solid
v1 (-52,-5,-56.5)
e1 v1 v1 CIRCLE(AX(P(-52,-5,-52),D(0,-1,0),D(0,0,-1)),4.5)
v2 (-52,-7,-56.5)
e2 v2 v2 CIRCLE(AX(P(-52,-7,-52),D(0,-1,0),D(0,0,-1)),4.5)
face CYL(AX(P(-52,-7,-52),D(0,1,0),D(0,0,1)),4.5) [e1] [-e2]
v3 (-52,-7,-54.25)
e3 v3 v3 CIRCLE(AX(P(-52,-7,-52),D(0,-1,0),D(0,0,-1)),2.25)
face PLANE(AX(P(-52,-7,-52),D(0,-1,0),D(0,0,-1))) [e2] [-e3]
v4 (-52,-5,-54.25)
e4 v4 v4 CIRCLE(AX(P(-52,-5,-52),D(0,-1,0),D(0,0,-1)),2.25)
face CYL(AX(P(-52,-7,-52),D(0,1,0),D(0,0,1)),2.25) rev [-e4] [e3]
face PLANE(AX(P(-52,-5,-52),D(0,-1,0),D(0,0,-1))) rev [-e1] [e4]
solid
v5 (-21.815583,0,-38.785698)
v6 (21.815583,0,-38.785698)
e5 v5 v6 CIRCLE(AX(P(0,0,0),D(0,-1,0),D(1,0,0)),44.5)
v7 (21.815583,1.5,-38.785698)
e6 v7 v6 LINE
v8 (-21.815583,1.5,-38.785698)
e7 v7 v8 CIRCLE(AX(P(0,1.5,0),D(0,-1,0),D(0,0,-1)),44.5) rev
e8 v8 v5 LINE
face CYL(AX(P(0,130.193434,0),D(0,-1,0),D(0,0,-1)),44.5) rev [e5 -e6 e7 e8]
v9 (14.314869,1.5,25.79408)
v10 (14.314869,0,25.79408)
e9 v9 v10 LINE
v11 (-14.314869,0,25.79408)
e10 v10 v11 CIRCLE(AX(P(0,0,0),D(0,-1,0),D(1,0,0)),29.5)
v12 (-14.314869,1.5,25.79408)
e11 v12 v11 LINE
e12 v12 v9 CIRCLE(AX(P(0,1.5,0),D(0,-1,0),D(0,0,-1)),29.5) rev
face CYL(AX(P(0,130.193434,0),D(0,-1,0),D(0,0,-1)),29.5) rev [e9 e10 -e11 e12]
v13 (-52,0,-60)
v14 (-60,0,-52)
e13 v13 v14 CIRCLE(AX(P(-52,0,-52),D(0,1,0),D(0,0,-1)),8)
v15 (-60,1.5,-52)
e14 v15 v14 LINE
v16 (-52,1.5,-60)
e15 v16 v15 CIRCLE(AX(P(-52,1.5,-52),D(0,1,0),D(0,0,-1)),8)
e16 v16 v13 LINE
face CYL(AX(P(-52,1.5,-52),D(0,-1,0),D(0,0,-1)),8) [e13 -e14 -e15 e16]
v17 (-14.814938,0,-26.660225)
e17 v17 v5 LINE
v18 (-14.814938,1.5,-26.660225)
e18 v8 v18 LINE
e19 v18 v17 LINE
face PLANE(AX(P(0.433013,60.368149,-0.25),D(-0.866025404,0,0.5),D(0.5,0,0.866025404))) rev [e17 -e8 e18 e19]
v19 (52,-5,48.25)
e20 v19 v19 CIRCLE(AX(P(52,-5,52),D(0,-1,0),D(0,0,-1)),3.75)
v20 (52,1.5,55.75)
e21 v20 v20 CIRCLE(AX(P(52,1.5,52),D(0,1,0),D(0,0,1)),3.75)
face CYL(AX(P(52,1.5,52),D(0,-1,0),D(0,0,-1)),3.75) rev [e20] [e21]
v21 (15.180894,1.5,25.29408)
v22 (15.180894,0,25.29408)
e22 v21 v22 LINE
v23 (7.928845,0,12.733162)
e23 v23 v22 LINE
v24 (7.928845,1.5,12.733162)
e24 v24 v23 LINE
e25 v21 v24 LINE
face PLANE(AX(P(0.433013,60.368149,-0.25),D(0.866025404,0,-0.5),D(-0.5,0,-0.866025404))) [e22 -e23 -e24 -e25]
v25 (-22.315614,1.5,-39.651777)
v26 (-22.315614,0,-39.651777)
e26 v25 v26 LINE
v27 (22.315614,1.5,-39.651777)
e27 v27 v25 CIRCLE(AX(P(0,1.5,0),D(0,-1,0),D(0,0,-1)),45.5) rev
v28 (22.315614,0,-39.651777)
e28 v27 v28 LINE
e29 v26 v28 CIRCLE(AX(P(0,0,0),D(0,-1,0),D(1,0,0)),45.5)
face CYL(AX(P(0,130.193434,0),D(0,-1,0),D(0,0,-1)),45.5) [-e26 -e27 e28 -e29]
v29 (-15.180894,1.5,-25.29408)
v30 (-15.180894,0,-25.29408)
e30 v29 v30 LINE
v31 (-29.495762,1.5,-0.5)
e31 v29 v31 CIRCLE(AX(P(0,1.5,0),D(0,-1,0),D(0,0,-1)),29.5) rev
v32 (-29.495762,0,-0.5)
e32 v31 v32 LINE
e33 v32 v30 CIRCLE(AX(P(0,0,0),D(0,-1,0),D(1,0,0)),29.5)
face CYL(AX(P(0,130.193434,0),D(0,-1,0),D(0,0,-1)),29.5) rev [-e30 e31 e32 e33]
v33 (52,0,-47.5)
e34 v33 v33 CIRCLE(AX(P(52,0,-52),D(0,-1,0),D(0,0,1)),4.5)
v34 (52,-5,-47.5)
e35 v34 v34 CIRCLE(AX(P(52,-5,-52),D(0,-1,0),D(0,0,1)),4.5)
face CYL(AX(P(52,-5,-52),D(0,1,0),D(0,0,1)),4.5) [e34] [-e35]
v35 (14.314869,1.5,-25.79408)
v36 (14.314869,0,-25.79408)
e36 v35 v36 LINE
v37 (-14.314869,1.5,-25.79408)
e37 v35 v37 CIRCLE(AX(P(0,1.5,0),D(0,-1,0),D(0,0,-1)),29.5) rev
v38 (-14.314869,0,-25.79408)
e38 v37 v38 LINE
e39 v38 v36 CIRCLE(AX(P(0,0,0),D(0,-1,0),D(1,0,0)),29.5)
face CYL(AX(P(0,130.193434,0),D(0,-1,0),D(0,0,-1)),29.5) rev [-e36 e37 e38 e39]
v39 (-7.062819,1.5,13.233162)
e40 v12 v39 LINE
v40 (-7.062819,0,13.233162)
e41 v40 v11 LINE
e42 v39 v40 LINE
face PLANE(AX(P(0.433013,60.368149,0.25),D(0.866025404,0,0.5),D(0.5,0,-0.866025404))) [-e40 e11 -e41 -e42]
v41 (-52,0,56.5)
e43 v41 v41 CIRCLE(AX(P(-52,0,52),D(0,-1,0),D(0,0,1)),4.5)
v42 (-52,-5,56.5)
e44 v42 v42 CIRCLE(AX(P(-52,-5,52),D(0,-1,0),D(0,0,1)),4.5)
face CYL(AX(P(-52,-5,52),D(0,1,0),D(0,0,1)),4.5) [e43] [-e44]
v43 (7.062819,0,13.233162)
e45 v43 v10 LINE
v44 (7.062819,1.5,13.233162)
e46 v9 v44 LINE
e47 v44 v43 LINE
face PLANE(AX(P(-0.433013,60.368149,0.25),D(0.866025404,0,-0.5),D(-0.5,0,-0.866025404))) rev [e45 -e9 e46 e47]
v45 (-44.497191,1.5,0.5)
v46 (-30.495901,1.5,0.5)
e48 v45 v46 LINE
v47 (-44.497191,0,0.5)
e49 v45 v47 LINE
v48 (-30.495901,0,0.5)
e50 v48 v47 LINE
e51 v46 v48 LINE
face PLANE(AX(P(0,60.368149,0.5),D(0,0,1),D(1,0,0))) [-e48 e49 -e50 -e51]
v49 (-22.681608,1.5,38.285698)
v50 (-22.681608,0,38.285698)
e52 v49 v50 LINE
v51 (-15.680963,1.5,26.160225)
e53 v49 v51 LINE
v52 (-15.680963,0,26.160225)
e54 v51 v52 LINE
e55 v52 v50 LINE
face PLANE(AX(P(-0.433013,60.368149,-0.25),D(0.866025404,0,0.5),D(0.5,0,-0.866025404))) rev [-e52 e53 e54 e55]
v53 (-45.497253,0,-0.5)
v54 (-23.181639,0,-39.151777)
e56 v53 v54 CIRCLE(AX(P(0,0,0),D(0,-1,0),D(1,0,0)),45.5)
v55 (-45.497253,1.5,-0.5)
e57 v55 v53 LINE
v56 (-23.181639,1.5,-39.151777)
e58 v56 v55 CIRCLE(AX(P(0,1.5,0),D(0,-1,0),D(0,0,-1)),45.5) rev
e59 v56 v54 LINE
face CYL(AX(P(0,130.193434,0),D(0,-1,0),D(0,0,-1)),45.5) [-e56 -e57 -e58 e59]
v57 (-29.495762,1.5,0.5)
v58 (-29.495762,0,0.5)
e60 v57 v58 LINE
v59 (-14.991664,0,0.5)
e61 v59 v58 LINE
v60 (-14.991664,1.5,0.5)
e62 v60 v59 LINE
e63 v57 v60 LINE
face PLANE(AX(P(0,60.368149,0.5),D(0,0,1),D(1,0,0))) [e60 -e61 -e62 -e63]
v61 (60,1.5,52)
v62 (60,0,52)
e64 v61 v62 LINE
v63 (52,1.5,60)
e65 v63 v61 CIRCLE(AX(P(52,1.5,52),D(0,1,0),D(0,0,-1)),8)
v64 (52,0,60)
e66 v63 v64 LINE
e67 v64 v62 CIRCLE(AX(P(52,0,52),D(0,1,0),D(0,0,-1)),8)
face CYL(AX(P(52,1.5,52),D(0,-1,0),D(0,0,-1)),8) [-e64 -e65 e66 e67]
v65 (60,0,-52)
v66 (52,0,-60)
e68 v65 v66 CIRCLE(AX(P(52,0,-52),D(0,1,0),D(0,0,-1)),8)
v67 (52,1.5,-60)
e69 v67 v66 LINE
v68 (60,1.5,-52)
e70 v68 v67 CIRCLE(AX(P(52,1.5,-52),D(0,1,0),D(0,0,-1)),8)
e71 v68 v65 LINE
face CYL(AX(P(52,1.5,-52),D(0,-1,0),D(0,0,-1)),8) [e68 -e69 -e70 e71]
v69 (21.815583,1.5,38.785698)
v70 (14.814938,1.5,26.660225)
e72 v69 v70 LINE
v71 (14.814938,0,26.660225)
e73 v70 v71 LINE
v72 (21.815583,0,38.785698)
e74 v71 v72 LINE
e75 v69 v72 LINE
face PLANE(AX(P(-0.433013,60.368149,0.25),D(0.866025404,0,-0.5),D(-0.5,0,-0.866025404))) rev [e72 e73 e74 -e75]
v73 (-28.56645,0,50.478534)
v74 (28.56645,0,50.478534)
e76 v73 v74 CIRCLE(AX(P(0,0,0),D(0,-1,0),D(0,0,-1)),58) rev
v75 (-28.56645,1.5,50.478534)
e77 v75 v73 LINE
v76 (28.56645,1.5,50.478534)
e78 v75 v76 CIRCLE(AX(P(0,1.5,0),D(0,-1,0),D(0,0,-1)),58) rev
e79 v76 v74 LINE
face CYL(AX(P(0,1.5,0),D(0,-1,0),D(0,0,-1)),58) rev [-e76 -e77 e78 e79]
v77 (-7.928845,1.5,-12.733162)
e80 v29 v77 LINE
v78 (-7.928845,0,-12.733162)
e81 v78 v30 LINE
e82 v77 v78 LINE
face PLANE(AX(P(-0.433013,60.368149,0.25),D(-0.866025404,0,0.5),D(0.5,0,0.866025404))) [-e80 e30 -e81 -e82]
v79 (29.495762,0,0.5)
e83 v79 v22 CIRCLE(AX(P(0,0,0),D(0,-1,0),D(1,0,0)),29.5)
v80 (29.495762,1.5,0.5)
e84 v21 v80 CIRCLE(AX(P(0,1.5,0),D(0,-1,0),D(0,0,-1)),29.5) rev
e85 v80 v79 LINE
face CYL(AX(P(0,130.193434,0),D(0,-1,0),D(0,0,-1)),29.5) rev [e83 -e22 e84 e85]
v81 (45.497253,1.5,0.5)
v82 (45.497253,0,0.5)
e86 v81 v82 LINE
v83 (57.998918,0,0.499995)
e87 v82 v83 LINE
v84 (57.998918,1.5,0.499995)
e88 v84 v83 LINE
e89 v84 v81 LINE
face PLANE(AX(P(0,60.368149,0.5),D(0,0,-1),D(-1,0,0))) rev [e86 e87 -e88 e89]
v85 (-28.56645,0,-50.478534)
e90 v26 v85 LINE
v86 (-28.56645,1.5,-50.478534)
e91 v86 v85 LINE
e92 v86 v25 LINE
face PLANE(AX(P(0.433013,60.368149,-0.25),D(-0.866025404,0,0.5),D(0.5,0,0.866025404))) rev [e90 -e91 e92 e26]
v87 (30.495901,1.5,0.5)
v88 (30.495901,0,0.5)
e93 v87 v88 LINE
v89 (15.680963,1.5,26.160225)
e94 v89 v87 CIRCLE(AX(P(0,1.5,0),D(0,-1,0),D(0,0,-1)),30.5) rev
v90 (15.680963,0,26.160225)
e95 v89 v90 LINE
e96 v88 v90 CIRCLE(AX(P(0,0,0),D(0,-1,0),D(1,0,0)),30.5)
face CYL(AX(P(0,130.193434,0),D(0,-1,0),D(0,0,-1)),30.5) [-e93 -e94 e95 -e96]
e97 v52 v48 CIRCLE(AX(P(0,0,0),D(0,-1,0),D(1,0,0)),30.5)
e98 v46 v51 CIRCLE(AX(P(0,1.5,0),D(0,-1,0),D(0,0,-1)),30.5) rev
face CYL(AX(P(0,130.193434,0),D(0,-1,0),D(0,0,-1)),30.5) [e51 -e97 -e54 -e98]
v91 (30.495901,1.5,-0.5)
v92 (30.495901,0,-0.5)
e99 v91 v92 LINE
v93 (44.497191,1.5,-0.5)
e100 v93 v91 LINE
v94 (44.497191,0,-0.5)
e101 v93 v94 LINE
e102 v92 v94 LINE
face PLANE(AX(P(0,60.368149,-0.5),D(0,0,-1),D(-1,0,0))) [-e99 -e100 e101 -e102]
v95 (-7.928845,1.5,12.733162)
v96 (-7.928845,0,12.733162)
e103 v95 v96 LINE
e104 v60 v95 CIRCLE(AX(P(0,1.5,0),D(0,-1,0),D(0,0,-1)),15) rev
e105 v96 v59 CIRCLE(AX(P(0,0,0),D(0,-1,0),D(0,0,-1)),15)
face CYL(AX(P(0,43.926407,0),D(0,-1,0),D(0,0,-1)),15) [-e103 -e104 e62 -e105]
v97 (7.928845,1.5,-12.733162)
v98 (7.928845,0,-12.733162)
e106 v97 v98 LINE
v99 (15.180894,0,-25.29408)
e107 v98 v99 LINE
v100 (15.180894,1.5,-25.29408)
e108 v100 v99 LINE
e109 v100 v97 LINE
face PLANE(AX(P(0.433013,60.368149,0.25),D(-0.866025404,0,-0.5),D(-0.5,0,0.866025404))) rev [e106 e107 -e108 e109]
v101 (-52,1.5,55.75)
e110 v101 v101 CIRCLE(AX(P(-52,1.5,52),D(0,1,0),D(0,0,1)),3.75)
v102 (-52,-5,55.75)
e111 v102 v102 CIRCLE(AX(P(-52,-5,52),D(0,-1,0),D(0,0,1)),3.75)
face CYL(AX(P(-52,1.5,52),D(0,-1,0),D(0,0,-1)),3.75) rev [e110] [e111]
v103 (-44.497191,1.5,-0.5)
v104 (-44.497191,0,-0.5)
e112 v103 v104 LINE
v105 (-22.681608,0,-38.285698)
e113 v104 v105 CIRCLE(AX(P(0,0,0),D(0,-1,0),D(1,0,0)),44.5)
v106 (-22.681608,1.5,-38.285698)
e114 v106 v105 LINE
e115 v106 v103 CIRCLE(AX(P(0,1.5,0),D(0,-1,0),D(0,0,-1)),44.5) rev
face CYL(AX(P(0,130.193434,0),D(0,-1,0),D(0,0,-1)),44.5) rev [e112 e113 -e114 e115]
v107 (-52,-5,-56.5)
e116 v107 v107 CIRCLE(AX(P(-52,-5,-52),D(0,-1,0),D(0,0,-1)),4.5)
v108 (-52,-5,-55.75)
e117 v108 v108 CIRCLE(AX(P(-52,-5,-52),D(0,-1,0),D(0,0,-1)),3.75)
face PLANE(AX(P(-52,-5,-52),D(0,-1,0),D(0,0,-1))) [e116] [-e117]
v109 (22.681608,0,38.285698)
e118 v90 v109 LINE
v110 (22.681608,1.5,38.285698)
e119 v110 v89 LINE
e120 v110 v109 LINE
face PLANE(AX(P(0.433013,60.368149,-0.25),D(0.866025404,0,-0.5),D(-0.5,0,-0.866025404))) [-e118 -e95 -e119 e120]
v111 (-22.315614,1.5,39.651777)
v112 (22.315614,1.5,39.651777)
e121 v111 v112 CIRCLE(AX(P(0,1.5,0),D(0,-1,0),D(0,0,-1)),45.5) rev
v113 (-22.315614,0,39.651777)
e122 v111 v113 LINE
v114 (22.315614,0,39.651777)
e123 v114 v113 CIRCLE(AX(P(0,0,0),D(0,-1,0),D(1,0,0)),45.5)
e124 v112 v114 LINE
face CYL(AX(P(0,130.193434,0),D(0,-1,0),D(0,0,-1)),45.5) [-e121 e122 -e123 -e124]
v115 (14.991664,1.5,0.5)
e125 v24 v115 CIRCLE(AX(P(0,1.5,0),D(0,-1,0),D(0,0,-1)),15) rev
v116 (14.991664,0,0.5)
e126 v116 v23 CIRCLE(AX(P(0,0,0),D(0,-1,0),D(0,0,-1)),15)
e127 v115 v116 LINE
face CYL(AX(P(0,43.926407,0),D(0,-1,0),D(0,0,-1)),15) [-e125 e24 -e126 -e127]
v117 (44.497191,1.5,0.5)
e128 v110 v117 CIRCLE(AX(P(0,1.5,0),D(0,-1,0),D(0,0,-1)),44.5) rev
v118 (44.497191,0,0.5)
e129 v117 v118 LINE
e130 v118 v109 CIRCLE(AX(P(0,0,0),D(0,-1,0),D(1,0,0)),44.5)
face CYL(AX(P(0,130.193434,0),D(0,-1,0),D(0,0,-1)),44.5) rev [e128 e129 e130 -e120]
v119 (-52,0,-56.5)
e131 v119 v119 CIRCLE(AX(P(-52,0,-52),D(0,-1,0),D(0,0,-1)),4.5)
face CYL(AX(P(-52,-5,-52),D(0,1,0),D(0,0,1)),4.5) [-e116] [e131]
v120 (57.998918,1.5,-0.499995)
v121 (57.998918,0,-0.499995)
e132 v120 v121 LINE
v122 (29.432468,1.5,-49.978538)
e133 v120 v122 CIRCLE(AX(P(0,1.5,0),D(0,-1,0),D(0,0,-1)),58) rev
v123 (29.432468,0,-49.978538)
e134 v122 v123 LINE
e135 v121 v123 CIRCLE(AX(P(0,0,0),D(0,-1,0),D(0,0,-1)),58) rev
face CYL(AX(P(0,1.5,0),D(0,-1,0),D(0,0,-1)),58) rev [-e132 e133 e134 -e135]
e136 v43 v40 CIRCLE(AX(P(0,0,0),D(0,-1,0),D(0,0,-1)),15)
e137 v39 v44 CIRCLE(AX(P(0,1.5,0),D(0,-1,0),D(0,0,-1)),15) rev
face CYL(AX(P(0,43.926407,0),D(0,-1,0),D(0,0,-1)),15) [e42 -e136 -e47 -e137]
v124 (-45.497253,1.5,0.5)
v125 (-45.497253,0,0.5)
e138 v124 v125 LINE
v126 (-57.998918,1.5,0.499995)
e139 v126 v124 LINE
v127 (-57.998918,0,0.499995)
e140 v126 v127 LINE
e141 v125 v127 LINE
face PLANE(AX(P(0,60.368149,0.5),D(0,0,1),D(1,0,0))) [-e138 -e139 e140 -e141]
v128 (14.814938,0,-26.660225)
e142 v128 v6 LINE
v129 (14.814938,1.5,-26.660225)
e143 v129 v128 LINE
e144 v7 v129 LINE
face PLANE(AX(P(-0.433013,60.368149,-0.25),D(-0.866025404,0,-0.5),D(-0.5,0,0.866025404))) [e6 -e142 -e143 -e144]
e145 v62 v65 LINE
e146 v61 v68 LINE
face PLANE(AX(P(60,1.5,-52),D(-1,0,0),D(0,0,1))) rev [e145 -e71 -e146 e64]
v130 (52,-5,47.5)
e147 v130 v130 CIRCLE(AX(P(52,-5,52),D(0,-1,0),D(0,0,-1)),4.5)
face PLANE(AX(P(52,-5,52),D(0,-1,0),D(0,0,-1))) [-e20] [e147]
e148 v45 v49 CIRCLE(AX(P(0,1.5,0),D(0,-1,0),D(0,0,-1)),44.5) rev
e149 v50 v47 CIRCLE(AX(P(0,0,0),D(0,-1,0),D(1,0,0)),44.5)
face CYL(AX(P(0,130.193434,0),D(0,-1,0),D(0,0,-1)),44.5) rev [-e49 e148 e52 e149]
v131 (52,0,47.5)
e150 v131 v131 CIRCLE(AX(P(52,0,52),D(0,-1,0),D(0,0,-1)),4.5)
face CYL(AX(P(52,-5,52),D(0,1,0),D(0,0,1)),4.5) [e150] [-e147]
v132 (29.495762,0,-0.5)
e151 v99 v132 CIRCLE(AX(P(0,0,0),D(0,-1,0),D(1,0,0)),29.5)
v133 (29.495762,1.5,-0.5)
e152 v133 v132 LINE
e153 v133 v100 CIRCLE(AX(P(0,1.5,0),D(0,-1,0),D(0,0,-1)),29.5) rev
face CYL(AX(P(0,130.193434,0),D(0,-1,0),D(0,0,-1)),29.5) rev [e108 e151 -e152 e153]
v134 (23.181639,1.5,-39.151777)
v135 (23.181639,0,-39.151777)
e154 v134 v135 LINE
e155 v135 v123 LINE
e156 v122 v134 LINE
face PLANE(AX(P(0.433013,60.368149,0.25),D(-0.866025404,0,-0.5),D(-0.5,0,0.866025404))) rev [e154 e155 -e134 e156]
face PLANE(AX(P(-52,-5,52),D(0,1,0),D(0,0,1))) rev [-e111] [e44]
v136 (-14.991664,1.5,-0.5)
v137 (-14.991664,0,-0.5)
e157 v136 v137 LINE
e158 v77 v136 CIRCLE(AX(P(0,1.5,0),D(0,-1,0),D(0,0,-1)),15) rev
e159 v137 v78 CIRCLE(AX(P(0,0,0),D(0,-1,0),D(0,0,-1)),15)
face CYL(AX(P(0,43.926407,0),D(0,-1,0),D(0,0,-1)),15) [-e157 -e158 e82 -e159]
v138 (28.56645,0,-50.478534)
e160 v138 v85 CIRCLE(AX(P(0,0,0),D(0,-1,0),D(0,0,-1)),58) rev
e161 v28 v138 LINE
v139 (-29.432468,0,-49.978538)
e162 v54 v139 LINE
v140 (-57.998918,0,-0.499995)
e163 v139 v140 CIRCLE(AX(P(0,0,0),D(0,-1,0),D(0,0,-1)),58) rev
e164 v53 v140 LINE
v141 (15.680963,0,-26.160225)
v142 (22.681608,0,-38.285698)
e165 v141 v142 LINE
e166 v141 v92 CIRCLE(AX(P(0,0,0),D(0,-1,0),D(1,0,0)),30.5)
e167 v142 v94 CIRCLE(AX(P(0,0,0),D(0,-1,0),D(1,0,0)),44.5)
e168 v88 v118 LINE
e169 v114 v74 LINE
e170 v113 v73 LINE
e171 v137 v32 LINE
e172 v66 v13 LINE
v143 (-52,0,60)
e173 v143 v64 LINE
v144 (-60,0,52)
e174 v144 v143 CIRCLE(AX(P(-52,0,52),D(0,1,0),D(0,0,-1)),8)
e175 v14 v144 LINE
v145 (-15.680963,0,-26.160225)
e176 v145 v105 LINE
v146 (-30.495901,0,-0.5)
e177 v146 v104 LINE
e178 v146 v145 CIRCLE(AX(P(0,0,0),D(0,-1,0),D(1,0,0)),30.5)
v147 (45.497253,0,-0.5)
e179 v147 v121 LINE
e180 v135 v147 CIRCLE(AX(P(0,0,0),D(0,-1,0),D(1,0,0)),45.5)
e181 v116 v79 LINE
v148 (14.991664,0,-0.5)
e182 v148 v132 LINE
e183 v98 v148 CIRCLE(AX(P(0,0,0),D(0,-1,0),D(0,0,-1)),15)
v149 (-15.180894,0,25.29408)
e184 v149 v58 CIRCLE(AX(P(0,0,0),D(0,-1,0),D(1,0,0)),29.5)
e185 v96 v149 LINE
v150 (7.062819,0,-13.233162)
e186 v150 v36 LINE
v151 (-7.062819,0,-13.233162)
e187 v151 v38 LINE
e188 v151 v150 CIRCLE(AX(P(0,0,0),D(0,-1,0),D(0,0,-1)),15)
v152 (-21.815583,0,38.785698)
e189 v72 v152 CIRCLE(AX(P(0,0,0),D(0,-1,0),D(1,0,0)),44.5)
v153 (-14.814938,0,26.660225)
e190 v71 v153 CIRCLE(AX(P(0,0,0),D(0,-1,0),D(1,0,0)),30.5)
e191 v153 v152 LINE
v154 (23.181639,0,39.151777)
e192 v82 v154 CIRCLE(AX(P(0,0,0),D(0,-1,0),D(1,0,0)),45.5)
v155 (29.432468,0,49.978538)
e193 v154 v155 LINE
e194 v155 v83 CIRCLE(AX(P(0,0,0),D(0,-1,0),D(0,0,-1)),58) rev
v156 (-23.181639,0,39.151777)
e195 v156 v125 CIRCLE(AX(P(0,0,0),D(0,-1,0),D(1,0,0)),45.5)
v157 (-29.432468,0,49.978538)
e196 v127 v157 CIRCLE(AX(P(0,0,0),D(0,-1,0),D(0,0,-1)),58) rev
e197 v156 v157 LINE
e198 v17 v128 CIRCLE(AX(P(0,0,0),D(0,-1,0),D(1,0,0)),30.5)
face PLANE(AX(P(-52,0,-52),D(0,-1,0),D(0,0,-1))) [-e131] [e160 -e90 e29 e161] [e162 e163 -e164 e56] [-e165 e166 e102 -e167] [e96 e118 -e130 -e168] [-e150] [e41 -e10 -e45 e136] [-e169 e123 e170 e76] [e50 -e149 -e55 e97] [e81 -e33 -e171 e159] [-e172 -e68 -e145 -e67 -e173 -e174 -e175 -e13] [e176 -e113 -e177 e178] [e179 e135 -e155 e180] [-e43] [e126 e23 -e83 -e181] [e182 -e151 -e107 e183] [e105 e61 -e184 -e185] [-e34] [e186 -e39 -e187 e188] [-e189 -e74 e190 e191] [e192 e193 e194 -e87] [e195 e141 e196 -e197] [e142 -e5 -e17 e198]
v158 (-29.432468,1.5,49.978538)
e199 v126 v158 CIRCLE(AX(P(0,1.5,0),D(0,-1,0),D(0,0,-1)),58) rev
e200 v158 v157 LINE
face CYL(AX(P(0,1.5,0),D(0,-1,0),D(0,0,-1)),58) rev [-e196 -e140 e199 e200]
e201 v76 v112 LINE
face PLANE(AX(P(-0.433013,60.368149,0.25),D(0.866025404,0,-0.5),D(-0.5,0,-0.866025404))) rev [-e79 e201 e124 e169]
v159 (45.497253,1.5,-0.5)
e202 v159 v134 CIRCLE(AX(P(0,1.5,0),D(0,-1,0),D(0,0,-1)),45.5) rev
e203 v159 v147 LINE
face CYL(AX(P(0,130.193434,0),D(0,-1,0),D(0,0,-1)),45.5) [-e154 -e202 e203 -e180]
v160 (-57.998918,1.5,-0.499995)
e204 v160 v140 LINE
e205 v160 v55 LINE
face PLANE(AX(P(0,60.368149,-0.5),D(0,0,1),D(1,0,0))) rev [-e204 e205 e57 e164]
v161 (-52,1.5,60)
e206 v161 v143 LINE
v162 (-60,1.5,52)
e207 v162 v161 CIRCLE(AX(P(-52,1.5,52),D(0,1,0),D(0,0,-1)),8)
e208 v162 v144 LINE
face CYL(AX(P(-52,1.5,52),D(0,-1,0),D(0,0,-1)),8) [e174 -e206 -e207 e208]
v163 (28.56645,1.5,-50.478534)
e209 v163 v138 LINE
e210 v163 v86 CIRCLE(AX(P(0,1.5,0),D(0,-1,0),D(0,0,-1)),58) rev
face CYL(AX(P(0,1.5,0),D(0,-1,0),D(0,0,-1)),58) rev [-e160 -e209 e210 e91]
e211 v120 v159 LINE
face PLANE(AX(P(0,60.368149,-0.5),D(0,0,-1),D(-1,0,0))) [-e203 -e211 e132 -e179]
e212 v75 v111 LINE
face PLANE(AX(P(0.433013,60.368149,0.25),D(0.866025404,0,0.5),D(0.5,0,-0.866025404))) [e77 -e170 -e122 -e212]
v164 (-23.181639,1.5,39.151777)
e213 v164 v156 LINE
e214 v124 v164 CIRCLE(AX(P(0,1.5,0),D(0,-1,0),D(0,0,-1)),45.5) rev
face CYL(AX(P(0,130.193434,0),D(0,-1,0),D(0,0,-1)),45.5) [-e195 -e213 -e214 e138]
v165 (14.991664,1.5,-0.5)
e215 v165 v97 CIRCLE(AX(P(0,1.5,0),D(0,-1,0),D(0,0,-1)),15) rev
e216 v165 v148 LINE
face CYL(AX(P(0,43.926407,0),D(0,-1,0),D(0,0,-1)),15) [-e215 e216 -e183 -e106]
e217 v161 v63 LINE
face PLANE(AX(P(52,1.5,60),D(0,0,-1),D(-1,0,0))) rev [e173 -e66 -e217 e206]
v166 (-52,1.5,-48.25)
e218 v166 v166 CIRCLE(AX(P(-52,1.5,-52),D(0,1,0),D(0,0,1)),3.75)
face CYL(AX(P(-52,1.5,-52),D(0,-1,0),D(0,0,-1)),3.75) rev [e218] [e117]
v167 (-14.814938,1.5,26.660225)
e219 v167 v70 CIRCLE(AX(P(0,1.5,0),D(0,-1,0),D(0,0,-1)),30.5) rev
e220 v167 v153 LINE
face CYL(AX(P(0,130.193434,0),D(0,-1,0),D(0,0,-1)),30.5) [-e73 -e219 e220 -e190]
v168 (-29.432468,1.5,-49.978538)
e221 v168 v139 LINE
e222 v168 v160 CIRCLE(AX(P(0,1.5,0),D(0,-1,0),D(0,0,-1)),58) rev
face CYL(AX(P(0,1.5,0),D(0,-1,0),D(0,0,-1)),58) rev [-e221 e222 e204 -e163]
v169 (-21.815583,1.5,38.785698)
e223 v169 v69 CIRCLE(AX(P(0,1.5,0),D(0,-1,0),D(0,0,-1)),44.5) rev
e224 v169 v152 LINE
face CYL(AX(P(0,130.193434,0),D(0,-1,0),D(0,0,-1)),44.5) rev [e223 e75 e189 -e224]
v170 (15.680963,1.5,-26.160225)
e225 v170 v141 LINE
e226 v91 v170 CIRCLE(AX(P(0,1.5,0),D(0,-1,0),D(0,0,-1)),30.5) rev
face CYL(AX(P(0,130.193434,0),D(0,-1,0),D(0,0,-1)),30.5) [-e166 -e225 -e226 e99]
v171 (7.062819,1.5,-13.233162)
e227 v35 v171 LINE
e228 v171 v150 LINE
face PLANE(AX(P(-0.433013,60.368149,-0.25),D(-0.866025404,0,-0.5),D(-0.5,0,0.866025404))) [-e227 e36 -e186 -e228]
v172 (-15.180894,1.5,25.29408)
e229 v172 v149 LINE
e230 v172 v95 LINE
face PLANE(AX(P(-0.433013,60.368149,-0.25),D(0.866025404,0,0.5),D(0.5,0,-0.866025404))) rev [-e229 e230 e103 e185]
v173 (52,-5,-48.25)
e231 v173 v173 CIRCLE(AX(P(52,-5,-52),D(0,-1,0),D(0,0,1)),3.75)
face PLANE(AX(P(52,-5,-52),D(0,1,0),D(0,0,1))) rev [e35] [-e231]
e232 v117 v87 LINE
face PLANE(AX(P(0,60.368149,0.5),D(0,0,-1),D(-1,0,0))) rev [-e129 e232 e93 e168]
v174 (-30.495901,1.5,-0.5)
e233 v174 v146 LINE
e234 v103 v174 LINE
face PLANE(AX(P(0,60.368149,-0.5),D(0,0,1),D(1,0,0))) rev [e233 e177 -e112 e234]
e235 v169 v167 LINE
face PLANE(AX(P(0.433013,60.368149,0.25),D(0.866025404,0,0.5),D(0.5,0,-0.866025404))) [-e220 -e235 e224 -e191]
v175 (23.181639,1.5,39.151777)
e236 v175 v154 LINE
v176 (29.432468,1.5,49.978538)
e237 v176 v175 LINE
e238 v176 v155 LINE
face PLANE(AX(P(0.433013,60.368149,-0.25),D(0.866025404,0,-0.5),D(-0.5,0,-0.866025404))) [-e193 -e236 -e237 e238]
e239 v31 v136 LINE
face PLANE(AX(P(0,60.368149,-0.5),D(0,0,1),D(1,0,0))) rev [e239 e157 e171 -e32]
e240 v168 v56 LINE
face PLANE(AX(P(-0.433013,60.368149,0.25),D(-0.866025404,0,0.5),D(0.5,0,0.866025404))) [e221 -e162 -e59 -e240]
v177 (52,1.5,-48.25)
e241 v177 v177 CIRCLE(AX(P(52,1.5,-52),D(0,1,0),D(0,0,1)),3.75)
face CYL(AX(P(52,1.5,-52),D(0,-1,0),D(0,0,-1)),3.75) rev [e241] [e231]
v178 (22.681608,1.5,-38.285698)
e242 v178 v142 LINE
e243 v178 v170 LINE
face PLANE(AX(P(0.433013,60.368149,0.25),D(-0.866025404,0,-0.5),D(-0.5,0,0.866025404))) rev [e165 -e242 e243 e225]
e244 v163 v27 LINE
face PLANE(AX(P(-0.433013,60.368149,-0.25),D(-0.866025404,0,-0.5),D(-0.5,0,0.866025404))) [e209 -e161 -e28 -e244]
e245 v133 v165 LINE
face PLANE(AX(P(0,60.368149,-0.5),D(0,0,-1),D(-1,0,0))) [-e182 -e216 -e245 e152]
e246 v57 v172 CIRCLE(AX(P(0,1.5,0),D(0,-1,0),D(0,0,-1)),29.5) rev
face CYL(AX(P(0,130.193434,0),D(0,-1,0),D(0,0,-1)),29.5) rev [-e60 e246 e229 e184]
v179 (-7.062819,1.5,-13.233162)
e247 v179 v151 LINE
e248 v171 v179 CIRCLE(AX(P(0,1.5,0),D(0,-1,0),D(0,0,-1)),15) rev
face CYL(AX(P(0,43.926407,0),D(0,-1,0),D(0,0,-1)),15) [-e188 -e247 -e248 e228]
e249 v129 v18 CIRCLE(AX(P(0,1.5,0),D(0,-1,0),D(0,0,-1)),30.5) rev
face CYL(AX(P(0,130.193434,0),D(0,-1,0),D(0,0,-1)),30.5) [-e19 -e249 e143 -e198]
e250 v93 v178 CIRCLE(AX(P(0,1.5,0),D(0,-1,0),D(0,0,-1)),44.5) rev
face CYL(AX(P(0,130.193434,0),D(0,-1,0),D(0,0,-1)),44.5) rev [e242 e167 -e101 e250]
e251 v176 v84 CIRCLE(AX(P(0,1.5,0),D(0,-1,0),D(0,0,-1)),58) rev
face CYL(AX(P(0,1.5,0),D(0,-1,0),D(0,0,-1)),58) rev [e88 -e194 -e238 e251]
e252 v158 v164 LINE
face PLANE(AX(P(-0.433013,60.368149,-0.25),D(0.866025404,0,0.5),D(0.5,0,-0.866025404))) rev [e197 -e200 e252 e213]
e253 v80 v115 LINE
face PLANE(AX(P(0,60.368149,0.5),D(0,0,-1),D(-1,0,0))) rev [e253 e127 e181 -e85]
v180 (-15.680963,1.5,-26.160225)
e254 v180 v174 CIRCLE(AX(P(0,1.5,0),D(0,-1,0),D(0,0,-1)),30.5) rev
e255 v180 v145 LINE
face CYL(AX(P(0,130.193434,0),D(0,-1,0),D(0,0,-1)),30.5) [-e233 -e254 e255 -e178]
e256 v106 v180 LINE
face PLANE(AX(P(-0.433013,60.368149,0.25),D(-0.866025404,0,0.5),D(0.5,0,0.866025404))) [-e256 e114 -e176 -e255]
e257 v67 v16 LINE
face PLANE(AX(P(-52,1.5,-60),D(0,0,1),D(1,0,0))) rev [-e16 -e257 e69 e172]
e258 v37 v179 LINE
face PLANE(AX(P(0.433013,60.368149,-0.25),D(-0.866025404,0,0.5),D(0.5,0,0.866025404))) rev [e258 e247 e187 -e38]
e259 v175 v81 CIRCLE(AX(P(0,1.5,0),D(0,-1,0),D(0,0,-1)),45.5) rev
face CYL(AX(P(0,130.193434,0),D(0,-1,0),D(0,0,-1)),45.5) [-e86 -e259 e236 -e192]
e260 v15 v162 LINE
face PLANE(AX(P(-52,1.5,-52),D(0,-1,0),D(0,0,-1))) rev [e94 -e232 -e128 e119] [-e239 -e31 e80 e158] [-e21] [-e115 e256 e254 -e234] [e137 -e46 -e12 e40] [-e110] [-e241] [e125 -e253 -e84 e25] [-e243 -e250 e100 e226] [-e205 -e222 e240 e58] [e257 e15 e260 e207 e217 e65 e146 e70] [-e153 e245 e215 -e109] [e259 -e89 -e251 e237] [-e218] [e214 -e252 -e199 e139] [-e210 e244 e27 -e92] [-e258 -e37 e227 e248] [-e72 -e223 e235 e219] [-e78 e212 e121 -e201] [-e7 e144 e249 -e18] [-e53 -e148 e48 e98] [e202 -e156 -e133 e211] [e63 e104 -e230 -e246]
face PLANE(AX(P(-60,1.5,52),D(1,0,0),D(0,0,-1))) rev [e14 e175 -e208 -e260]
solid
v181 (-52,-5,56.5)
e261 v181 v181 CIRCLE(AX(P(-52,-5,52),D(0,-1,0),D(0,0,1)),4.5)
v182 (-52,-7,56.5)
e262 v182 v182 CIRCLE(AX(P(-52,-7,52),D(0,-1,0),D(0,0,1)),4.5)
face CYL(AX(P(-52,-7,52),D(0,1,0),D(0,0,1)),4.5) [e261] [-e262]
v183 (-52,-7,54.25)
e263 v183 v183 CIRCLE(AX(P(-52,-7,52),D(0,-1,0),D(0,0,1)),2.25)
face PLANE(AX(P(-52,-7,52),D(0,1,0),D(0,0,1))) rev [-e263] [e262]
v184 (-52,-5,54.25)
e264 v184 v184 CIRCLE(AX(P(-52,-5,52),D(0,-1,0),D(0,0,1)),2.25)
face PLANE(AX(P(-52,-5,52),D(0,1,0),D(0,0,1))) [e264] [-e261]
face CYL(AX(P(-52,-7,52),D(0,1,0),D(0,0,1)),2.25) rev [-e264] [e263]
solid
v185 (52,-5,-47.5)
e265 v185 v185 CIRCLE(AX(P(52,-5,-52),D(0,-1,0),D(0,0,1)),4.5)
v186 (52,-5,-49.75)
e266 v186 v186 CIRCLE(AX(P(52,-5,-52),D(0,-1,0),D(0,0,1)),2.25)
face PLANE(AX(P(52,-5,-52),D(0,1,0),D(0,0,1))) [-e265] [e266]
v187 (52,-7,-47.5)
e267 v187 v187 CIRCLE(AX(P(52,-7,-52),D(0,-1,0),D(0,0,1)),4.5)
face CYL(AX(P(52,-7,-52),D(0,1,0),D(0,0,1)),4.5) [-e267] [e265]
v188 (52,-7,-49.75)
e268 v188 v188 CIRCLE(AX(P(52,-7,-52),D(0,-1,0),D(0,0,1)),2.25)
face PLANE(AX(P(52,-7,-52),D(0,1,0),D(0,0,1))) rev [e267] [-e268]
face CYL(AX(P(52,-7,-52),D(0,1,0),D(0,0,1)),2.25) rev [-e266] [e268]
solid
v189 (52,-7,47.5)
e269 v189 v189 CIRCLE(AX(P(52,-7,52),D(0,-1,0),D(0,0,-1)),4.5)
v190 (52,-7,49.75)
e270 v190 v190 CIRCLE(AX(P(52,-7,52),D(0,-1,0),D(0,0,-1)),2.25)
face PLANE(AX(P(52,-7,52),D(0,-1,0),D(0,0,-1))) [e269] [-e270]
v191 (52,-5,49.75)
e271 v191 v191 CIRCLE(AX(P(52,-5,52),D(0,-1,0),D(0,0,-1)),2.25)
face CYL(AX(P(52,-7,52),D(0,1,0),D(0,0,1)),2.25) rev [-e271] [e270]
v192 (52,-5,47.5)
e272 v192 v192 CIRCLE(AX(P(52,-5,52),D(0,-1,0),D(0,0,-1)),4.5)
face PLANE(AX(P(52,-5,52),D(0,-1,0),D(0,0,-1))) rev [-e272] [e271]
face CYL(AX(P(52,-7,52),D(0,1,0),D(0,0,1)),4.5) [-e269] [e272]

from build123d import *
from build123d.topology import SkipClean

# Parameters (mm, degrees)
SKETCH_1_R        = 3.75
SKETCH_1_R_2      = 58
EXTRUDE_1_DEPTH   = 1.5
EXTRUDE_START     = -1.5
EXTRUDE_1_2_DEPTH = 1.5
EXTRUDE_2_DEPTH   = 1.5
EXTRUDE_START_2   = 5
SKETCH_3_R        = 4.5
SKETCH_3_R_2      = 3.75
EXTRUDE_3_DEPTH   = 5
SKETCH_4_R        = 4.5
SKETCH_4_R_2      = 2.25
EXTRUDE_4_DEPTH   = 2
EXTRUDE_4_2_DEPTH = 2
EXTRUDE_4_3_DEPTH = 2
EXTRUDE_4_4_DEPTH = 2


# Read off the part's stored shape, not the designer's step: 拉伸-薄壁1
with BuildPart() as part:
    # 草图1 → Extrude 1 (new body)
    with BuildSketch(Plane(origin=(0, 0, 0), x_dir=(1, 0, 0), z_dir=(0, 1, 0))):
        with BuildLine():
            Line((-52, 60), (52, 60))
            ThreePointArc((52, 60), (57.656854249, 57.656854249), (60, 52))
            Line((60, 52), (60, -52))
            ThreePointArc((60, -52), (57.656854249, -57.656854249), (52, -60))
            Line((52, -60), (-52, -60))
            ThreePointArc((-52, -60), (-57.656854249, -57.656854249), (-60, -52))
            Line((-60, -52), (-60, 52))
            ThreePointArc((-60, 52), (-57.656854249, 57.656854249), (-52, 60))
        make_face()
        with Locations(Location((52, 52, 0), (0, 0, 270))):
            Circle(SKETCH_1_R, mode=Mode.SUBTRACT)
        with Locations(Location((52, -52, 0), (0, 0, 270))):
            Circle(SKETCH_1_R, mode=Mode.SUBTRACT)
        with Locations(Location((-52, 52, 0), (0, 0, 270))):
            Circle(SKETCH_1_R, mode=Mode.SUBTRACT)
        with Locations(Location((-52, -52, 0), (0, 0, 270))):
            Circle(SKETCH_1_R, mode=Mode.SUBTRACT)
        with Locations(Location((0, 0, 0), (0, 0, 270))):
            Circle(SKETCH_1_R_2, mode=Mode.SUBTRACT)
    extrude(amount=EXTRUDE_1_DEPTH)

    # Extrude 1 2 outline → Extrude 1 2 (add)
    with BuildSketch(Plane.XZ.offset(EXTRUDE_START)):
        with BuildLine():
            Line((57.997844907, 0.499986102), (45.497252664, 0.5))
            ThreePointArc((45.497252664, 0.5), (39.404155872, 22.75), (23.181639034, 39.15177661))
            Line((23.181639034, 39.15177661), (29.431923607, 49.977613716))
            ThreePointArc((29.431923607, 49.977613716), (28.999999948, 50.229473449), (28.565921191, 50.477600443))
            Line((28.565921191, 50.477600443), (22.31561363, 39.65177661))
            ThreePointArc((22.31561363, 39.65177661), (0, 45.5), (-22.31561363, 39.65177661))
            Line((-22.31561363, 39.65177661), (-28.565921191, 50.477600443))
            ThreePointArc((-28.565921191, 50.477600443), (-28.999999948, 50.229473449), (-29.431923607, 49.977613716))
            Line((-29.431923607, 49.977613716), (-23.181639034, 39.15177661))
            ThreePointArc((-23.181639034, 39.15177661), (-39.404155872, 22.75), (-45.497252664, 0.5))
            Line((-45.497252664, 0.5), (-57.997844907, 0.499986102))
            ThreePointArc((-57.997844907, 0.499986102), (-58, 0), (-57.997844907, -0.499986102))
            Line((-57.997844907, -0.499986102), (-45.497252664, -0.5))
            ThreePointArc((-45.497252664, -0.5), (-39.404155872, -22.75), (-23.181639034, -39.15177661))
            Line((-23.181639034, -39.15177661), (-29.431923607, -49.977613716))
            ThreePointArc((-29.431923607, -49.977613716), (-28.999999948, -50.229473449), (-28.565921191, -50.477600443))
            Line((-28.565921191, -50.477600443), (-22.31561363, -39.65177661))
            ThreePointArc((-22.31561363, -39.65177661), (0, -45.5), (22.31561363, -39.65177661))
            Line((22.31561363, -39.65177661), (28.565921191, -50.477600443))
            ThreePointArc((28.565921191, -50.477600443), (28.999999948, -50.229473449), (29.431923607, -49.977613716))
            Line((29.431923607, -49.977613716), (23.181639034, -39.15177661))
            ThreePointArc((23.181639034, -39.15177661), (39.404155872, -22.75), (45.497252664, -0.5))
            Line((45.497252664, -0.5), (57.997844907, -0.499986102))
            ThreePointArc((57.997844907, -0.499986102), (58, 0), (57.997844907, 0.499986102))
        make_face()
        with BuildLine():
            Line((-44.497190923, -0.5), (-30.495901364, -0.5))
            ThreePointArc((-30.495901364, -0.5), (-26.413774815, -15.25), (-15.680963384, -26.160225292))
            Line((-15.680963384, -26.160225292), (-22.681608163, -38.285697736))
            ThreePointArc((-22.681608163, -38.285697736), (-38.538130468, -22.25), (-44.497190923, -0.5))
        make_face(mode=Mode.SUBTRACT)
        with BuildLine():
            Line((-29.495762408, -0.5), (-0.866025404, -0.5))
            Line((-0.866025404, -0.5), (-15.180893906, -25.294079549))
            ThreePointArc((-15.180893906, -25.294079549), (-25.547749412, -14.75), (-29.495762408, -0.5))
        make_face(mode=Mode.SUBTRACT)
        with BuildLine():
            ThreePointArc((21.815582759, -38.785697736), (0, -44.5), (-21.815582759, -38.785697736))
            Line((-21.815582759, -38.785697736), (-14.81493798, -26.660225292))
            ThreePointArc((-14.81493798, -26.660225292), (0, -30.5), (14.81493798, -26.660225292))
            Line((14.81493798, -26.660225292), (21.815582759, -38.785697736))
        make_face(mode=Mode.SUBTRACT)
        with BuildLine():
            Line((-14.314868502, -25.794079549), (0, -1))
            Line((0, -1), (14.314868502, -25.794079549))
            ThreePointArc((14.314868502, -25.794079549), (0, -29.5), (-14.314868502, -25.794079549))
        make_face(mode=Mode.SUBTRACT)
        with BuildLine():
            Line((15.180893906, -25.294079549), (0.866025404, -0.5))
            Line((0.866025404, -0.5), (29.495762408, -0.5))
            ThreePointArc((29.495762408, -0.5), (25.547749412, -14.75), (15.180893906, -25.294079549))
        make_face(mode=Mode.SUBTRACT)
        with BuildLine():
            ThreePointArc((15.680963384, -26.160225292), (26.413774815, -15.25), (30.495901364, -0.5))
            Line((30.495901364, -0.5), (44.497190923, -0.5))
            ThreePointArc((44.497190923, -0.5), (38.538130468, -22.25), (22.681608163, -38.285697736))
            Line((22.681608163, -38.285697736), (15.680963384, -26.160225292))
        make_face(mode=Mode.SUBTRACT)
        with BuildLine():
            ThreePointArc((-15.680963384, 26.160225292), (-26.413774815, 15.25), (-30.495901364, 0.5))
            Line((-30.495901364, 0.5), (-44.497190923, 0.5))
            ThreePointArc((-44.497190923, 0.5), (-38.538130468, 22.25), (-22.681608163, 38.285697736))
            Line((-22.681608163, 38.285697736), (-15.680963384, 26.160225292))
        make_face(mode=Mode.SUBTRACT)
        with BuildLine():
            Line((-15.180893906, 25.294079549), (-0.866025404, 0.5))
            Line((-0.866025404, 0.5), (-29.495762408, 0.5))
            ThreePointArc((-29.495762408, 0.5), (-25.547749412, 14.75), (-15.180893906, 25.294079549))
        make_face(mode=Mode.SUBTRACT)
        with BuildLine():
            Line((29.495762408, 0.5), (0.866025404, 0.5))
            Line((0.866025404, 0.5), (15.180893906, 25.294079549))
            ThreePointArc((15.180893906, 25.294079549), (25.547749412, 14.75), (29.495762408, 0.5))
        make_face(mode=Mode.SUBTRACT)
        with BuildLine():
            Line((14.314868502, 25.794079549), (0, 1))
            Line((0, 1), (-14.314868502, 25.794079549))
            ThreePointArc((-14.314868502, 25.794079549), (0, 29.5), (14.314868502, 25.794079549))
        make_face(mode=Mode.SUBTRACT)
        with BuildLine():
            Line((44.497190923, 0.5), (30.495901364, 0.5))
            ThreePointArc((30.495901364, 0.5), (26.413774815, 15.25), (15.680963384, 26.160225292))
            Line((15.680963384, 26.160225292), (22.681608163, 38.285697736))
            ThreePointArc((22.681608163, 38.285697736), (38.538130468, 22.25), (44.497190923, 0.5))
        make_face(mode=Mode.SUBTRACT)
        with BuildLine():
            ThreePointArc((-21.815582759, 38.785697736), (0, 44.5), (21.815582759, 38.785697736))
            Line((21.815582759, 38.785697736), (14.81493798, 26.660225292))
            ThreePointArc((14.81493798, 26.660225292), (0, 30.5), (-14.81493798, 26.660225292))
            Line((-14.81493798, 26.660225292), (-21.815582759, 38.785697736))
        make_face(mode=Mode.SUBTRACT)
    extrude(amount=EXTRUDE_1_2_DEPTH)

    # 草图2<3> → 凸台-拉伸2 (add)
    with BuildSketch(Plane.XZ):
        with BuildLine():
            Line((-7.5, -12.990381057), (0, 0))
            Line((0, 0), (-15, 0))
            ThreePointArc((-15, 0), (-12.990381057, -7.5), (-7.5, -12.990381057))
        make_face()
        with BuildLine():
            Line((7.5, -12.990381057), (0, 0))
            Line((0, 0), (-7.5, -12.990381057))
            ThreePointArc((-7.5, -12.990381057), (0, -15), (7.5, -12.990381057))
        make_face()
        with BuildLine():
            Line((15, 0), (0, 0))
            Line((0, 0), (7.5, -12.990381057))
            ThreePointArc((7.5, -12.990381057), (12.990381057, -7.5), (15, 0))
        make_face()
        with BuildLine():
            Line((7.5, 12.990381057), (0, 0))
            Line((0, 0), (15, 0))
            ThreePointArc((15, 0), (12.990381057, 7.5), (7.5, 12.990381057))
        make_face()
        with BuildLine():
            Line((-7.5, 12.990381057), (0, 0))
            Line((0, 0), (7.5, 12.990381057))
            ThreePointArc((7.5, 12.990381057), (0, 15), (-7.5, 12.990381057))
        make_face()
        with BuildLine():
            Line((-15, 0), (0, 0))
            Line((0, 0), (-7.5, 12.990381057))
            ThreePointArc((-7.5, 12.990381057), (-12.990381057, 7.5), (-15, 0))
        make_face()
    extrude(amount=-EXTRUDE_2_DEPTH)

    # 草图3 → 凸台-拉伸3 (add)
    # profile 1 of 4: a face of its own
    with SkipClean():  # the faces are left unmerged after this step: merging them gives an invalid solid
        with BuildSketch(Plane.XZ.offset(EXTRUDE_START_2)):
            with Locations(Location((52, 52, 0), (0, 0, 270))):
                Circle(SKETCH_3_R)
            with Locations(Location((52, 52, 0), (0, 0, 270))):
                Circle(SKETCH_3_R_2, mode=Mode.SUBTRACT)
        # profile 2 of 4: a face of its own
        with BuildSketch(Plane.XZ.offset(EXTRUDE_START_2)):
            with Locations(Location((52, -52, 0), (0, 0, 90))):
                Circle(SKETCH_3_R)
            with Locations(Location((52, -52, 0), (0, 0, 90))):
                Circle(SKETCH_3_R_2, mode=Mode.SUBTRACT)
        # profile 3 of 4: a face of its own
        with BuildSketch(Plane.XZ.offset(EXTRUDE_START_2)):
            with Locations(Location((-52, -52, 0), (0, 0, 270))):
                Circle(SKETCH_3_R)
            with Locations(Location((-52, -52, 0), (0, 0, 270))):
                Circle(SKETCH_3_R_2, mode=Mode.SUBTRACT)
        # profile 4 of 4: a face of its own
        with BuildSketch(Plane.XZ.offset(EXTRUDE_START_2)):
            with Locations(Location((-52, 52, 0), (0, 0, 90))):
                Circle(SKETCH_3_R)
            with Locations(Location((-52, 52, 0), (0, 0, 90))):
                Circle(SKETCH_3_R_2, mode=Mode.SUBTRACT)
        extrude(amount=-EXTRUDE_3_DEPTH)


with BuildPart() as body_2:
    # 草图4 → 凸台-拉伸4 (new body)
    with BuildSketch(Plane.XZ.offset(5)):
        with Locations(Location((52, 52, 0), (0, 0, 270))):
            Circle(SKETCH_4_R)
        with Locations(Location((52, 52, 0), (0, 0, 270))):
            Circle(SKETCH_4_R_2, mode=Mode.SUBTRACT)
    extrude(amount=EXTRUDE_4_DEPTH)


with BuildPart() as body_3:
    # 草图4 → Extrude 4 2 (new body)
    with BuildSketch(Plane.XZ.offset(5)):
        with Locations(Location((52, -52, 0), (0, 0, 90))):
            Circle(SKETCH_4_R)
        with Locations(Location((52, -52, 0), (0, 0, 90))):
            Circle(SKETCH_4_R_2, mode=Mode.SUBTRACT)
    extrude(amount=EXTRUDE_4_2_DEPTH)


with BuildPart() as body_4:
    # 草图4 → Extrude 4 3 (new body)
    with BuildSketch(Plane.XZ.offset(5)):
        with Locations(Location((-52, -52, 0), (0, 0, 270))):
            Circle(SKETCH_4_R)
        with Locations(Location((-52, -52, 0), (0, 0, 270))):
            Circle(SKETCH_4_R_2, mode=Mode.SUBTRACT)
    extrude(amount=EXTRUDE_4_3_DEPTH)


with BuildPart() as body_5:
    # 草图4 → Extrude 4 4 (new body)
    with BuildSketch(Plane.XZ.offset(5)):
        with Locations(Location((-52, 52, 0), (0, 0, 90))):
            Circle(SKETCH_4_R)
        with Locations(Location((-52, 52, 0), (0, 0, 90))):
            Circle(SKETCH_4_R_2, mode=Mode.SUBTRACT)
    extrude(amount=EXTRUDE_4_4_DEPTH)


solid = Compound([part.part, body_2.part, body_3.part, body_4.part, body_5.part])
